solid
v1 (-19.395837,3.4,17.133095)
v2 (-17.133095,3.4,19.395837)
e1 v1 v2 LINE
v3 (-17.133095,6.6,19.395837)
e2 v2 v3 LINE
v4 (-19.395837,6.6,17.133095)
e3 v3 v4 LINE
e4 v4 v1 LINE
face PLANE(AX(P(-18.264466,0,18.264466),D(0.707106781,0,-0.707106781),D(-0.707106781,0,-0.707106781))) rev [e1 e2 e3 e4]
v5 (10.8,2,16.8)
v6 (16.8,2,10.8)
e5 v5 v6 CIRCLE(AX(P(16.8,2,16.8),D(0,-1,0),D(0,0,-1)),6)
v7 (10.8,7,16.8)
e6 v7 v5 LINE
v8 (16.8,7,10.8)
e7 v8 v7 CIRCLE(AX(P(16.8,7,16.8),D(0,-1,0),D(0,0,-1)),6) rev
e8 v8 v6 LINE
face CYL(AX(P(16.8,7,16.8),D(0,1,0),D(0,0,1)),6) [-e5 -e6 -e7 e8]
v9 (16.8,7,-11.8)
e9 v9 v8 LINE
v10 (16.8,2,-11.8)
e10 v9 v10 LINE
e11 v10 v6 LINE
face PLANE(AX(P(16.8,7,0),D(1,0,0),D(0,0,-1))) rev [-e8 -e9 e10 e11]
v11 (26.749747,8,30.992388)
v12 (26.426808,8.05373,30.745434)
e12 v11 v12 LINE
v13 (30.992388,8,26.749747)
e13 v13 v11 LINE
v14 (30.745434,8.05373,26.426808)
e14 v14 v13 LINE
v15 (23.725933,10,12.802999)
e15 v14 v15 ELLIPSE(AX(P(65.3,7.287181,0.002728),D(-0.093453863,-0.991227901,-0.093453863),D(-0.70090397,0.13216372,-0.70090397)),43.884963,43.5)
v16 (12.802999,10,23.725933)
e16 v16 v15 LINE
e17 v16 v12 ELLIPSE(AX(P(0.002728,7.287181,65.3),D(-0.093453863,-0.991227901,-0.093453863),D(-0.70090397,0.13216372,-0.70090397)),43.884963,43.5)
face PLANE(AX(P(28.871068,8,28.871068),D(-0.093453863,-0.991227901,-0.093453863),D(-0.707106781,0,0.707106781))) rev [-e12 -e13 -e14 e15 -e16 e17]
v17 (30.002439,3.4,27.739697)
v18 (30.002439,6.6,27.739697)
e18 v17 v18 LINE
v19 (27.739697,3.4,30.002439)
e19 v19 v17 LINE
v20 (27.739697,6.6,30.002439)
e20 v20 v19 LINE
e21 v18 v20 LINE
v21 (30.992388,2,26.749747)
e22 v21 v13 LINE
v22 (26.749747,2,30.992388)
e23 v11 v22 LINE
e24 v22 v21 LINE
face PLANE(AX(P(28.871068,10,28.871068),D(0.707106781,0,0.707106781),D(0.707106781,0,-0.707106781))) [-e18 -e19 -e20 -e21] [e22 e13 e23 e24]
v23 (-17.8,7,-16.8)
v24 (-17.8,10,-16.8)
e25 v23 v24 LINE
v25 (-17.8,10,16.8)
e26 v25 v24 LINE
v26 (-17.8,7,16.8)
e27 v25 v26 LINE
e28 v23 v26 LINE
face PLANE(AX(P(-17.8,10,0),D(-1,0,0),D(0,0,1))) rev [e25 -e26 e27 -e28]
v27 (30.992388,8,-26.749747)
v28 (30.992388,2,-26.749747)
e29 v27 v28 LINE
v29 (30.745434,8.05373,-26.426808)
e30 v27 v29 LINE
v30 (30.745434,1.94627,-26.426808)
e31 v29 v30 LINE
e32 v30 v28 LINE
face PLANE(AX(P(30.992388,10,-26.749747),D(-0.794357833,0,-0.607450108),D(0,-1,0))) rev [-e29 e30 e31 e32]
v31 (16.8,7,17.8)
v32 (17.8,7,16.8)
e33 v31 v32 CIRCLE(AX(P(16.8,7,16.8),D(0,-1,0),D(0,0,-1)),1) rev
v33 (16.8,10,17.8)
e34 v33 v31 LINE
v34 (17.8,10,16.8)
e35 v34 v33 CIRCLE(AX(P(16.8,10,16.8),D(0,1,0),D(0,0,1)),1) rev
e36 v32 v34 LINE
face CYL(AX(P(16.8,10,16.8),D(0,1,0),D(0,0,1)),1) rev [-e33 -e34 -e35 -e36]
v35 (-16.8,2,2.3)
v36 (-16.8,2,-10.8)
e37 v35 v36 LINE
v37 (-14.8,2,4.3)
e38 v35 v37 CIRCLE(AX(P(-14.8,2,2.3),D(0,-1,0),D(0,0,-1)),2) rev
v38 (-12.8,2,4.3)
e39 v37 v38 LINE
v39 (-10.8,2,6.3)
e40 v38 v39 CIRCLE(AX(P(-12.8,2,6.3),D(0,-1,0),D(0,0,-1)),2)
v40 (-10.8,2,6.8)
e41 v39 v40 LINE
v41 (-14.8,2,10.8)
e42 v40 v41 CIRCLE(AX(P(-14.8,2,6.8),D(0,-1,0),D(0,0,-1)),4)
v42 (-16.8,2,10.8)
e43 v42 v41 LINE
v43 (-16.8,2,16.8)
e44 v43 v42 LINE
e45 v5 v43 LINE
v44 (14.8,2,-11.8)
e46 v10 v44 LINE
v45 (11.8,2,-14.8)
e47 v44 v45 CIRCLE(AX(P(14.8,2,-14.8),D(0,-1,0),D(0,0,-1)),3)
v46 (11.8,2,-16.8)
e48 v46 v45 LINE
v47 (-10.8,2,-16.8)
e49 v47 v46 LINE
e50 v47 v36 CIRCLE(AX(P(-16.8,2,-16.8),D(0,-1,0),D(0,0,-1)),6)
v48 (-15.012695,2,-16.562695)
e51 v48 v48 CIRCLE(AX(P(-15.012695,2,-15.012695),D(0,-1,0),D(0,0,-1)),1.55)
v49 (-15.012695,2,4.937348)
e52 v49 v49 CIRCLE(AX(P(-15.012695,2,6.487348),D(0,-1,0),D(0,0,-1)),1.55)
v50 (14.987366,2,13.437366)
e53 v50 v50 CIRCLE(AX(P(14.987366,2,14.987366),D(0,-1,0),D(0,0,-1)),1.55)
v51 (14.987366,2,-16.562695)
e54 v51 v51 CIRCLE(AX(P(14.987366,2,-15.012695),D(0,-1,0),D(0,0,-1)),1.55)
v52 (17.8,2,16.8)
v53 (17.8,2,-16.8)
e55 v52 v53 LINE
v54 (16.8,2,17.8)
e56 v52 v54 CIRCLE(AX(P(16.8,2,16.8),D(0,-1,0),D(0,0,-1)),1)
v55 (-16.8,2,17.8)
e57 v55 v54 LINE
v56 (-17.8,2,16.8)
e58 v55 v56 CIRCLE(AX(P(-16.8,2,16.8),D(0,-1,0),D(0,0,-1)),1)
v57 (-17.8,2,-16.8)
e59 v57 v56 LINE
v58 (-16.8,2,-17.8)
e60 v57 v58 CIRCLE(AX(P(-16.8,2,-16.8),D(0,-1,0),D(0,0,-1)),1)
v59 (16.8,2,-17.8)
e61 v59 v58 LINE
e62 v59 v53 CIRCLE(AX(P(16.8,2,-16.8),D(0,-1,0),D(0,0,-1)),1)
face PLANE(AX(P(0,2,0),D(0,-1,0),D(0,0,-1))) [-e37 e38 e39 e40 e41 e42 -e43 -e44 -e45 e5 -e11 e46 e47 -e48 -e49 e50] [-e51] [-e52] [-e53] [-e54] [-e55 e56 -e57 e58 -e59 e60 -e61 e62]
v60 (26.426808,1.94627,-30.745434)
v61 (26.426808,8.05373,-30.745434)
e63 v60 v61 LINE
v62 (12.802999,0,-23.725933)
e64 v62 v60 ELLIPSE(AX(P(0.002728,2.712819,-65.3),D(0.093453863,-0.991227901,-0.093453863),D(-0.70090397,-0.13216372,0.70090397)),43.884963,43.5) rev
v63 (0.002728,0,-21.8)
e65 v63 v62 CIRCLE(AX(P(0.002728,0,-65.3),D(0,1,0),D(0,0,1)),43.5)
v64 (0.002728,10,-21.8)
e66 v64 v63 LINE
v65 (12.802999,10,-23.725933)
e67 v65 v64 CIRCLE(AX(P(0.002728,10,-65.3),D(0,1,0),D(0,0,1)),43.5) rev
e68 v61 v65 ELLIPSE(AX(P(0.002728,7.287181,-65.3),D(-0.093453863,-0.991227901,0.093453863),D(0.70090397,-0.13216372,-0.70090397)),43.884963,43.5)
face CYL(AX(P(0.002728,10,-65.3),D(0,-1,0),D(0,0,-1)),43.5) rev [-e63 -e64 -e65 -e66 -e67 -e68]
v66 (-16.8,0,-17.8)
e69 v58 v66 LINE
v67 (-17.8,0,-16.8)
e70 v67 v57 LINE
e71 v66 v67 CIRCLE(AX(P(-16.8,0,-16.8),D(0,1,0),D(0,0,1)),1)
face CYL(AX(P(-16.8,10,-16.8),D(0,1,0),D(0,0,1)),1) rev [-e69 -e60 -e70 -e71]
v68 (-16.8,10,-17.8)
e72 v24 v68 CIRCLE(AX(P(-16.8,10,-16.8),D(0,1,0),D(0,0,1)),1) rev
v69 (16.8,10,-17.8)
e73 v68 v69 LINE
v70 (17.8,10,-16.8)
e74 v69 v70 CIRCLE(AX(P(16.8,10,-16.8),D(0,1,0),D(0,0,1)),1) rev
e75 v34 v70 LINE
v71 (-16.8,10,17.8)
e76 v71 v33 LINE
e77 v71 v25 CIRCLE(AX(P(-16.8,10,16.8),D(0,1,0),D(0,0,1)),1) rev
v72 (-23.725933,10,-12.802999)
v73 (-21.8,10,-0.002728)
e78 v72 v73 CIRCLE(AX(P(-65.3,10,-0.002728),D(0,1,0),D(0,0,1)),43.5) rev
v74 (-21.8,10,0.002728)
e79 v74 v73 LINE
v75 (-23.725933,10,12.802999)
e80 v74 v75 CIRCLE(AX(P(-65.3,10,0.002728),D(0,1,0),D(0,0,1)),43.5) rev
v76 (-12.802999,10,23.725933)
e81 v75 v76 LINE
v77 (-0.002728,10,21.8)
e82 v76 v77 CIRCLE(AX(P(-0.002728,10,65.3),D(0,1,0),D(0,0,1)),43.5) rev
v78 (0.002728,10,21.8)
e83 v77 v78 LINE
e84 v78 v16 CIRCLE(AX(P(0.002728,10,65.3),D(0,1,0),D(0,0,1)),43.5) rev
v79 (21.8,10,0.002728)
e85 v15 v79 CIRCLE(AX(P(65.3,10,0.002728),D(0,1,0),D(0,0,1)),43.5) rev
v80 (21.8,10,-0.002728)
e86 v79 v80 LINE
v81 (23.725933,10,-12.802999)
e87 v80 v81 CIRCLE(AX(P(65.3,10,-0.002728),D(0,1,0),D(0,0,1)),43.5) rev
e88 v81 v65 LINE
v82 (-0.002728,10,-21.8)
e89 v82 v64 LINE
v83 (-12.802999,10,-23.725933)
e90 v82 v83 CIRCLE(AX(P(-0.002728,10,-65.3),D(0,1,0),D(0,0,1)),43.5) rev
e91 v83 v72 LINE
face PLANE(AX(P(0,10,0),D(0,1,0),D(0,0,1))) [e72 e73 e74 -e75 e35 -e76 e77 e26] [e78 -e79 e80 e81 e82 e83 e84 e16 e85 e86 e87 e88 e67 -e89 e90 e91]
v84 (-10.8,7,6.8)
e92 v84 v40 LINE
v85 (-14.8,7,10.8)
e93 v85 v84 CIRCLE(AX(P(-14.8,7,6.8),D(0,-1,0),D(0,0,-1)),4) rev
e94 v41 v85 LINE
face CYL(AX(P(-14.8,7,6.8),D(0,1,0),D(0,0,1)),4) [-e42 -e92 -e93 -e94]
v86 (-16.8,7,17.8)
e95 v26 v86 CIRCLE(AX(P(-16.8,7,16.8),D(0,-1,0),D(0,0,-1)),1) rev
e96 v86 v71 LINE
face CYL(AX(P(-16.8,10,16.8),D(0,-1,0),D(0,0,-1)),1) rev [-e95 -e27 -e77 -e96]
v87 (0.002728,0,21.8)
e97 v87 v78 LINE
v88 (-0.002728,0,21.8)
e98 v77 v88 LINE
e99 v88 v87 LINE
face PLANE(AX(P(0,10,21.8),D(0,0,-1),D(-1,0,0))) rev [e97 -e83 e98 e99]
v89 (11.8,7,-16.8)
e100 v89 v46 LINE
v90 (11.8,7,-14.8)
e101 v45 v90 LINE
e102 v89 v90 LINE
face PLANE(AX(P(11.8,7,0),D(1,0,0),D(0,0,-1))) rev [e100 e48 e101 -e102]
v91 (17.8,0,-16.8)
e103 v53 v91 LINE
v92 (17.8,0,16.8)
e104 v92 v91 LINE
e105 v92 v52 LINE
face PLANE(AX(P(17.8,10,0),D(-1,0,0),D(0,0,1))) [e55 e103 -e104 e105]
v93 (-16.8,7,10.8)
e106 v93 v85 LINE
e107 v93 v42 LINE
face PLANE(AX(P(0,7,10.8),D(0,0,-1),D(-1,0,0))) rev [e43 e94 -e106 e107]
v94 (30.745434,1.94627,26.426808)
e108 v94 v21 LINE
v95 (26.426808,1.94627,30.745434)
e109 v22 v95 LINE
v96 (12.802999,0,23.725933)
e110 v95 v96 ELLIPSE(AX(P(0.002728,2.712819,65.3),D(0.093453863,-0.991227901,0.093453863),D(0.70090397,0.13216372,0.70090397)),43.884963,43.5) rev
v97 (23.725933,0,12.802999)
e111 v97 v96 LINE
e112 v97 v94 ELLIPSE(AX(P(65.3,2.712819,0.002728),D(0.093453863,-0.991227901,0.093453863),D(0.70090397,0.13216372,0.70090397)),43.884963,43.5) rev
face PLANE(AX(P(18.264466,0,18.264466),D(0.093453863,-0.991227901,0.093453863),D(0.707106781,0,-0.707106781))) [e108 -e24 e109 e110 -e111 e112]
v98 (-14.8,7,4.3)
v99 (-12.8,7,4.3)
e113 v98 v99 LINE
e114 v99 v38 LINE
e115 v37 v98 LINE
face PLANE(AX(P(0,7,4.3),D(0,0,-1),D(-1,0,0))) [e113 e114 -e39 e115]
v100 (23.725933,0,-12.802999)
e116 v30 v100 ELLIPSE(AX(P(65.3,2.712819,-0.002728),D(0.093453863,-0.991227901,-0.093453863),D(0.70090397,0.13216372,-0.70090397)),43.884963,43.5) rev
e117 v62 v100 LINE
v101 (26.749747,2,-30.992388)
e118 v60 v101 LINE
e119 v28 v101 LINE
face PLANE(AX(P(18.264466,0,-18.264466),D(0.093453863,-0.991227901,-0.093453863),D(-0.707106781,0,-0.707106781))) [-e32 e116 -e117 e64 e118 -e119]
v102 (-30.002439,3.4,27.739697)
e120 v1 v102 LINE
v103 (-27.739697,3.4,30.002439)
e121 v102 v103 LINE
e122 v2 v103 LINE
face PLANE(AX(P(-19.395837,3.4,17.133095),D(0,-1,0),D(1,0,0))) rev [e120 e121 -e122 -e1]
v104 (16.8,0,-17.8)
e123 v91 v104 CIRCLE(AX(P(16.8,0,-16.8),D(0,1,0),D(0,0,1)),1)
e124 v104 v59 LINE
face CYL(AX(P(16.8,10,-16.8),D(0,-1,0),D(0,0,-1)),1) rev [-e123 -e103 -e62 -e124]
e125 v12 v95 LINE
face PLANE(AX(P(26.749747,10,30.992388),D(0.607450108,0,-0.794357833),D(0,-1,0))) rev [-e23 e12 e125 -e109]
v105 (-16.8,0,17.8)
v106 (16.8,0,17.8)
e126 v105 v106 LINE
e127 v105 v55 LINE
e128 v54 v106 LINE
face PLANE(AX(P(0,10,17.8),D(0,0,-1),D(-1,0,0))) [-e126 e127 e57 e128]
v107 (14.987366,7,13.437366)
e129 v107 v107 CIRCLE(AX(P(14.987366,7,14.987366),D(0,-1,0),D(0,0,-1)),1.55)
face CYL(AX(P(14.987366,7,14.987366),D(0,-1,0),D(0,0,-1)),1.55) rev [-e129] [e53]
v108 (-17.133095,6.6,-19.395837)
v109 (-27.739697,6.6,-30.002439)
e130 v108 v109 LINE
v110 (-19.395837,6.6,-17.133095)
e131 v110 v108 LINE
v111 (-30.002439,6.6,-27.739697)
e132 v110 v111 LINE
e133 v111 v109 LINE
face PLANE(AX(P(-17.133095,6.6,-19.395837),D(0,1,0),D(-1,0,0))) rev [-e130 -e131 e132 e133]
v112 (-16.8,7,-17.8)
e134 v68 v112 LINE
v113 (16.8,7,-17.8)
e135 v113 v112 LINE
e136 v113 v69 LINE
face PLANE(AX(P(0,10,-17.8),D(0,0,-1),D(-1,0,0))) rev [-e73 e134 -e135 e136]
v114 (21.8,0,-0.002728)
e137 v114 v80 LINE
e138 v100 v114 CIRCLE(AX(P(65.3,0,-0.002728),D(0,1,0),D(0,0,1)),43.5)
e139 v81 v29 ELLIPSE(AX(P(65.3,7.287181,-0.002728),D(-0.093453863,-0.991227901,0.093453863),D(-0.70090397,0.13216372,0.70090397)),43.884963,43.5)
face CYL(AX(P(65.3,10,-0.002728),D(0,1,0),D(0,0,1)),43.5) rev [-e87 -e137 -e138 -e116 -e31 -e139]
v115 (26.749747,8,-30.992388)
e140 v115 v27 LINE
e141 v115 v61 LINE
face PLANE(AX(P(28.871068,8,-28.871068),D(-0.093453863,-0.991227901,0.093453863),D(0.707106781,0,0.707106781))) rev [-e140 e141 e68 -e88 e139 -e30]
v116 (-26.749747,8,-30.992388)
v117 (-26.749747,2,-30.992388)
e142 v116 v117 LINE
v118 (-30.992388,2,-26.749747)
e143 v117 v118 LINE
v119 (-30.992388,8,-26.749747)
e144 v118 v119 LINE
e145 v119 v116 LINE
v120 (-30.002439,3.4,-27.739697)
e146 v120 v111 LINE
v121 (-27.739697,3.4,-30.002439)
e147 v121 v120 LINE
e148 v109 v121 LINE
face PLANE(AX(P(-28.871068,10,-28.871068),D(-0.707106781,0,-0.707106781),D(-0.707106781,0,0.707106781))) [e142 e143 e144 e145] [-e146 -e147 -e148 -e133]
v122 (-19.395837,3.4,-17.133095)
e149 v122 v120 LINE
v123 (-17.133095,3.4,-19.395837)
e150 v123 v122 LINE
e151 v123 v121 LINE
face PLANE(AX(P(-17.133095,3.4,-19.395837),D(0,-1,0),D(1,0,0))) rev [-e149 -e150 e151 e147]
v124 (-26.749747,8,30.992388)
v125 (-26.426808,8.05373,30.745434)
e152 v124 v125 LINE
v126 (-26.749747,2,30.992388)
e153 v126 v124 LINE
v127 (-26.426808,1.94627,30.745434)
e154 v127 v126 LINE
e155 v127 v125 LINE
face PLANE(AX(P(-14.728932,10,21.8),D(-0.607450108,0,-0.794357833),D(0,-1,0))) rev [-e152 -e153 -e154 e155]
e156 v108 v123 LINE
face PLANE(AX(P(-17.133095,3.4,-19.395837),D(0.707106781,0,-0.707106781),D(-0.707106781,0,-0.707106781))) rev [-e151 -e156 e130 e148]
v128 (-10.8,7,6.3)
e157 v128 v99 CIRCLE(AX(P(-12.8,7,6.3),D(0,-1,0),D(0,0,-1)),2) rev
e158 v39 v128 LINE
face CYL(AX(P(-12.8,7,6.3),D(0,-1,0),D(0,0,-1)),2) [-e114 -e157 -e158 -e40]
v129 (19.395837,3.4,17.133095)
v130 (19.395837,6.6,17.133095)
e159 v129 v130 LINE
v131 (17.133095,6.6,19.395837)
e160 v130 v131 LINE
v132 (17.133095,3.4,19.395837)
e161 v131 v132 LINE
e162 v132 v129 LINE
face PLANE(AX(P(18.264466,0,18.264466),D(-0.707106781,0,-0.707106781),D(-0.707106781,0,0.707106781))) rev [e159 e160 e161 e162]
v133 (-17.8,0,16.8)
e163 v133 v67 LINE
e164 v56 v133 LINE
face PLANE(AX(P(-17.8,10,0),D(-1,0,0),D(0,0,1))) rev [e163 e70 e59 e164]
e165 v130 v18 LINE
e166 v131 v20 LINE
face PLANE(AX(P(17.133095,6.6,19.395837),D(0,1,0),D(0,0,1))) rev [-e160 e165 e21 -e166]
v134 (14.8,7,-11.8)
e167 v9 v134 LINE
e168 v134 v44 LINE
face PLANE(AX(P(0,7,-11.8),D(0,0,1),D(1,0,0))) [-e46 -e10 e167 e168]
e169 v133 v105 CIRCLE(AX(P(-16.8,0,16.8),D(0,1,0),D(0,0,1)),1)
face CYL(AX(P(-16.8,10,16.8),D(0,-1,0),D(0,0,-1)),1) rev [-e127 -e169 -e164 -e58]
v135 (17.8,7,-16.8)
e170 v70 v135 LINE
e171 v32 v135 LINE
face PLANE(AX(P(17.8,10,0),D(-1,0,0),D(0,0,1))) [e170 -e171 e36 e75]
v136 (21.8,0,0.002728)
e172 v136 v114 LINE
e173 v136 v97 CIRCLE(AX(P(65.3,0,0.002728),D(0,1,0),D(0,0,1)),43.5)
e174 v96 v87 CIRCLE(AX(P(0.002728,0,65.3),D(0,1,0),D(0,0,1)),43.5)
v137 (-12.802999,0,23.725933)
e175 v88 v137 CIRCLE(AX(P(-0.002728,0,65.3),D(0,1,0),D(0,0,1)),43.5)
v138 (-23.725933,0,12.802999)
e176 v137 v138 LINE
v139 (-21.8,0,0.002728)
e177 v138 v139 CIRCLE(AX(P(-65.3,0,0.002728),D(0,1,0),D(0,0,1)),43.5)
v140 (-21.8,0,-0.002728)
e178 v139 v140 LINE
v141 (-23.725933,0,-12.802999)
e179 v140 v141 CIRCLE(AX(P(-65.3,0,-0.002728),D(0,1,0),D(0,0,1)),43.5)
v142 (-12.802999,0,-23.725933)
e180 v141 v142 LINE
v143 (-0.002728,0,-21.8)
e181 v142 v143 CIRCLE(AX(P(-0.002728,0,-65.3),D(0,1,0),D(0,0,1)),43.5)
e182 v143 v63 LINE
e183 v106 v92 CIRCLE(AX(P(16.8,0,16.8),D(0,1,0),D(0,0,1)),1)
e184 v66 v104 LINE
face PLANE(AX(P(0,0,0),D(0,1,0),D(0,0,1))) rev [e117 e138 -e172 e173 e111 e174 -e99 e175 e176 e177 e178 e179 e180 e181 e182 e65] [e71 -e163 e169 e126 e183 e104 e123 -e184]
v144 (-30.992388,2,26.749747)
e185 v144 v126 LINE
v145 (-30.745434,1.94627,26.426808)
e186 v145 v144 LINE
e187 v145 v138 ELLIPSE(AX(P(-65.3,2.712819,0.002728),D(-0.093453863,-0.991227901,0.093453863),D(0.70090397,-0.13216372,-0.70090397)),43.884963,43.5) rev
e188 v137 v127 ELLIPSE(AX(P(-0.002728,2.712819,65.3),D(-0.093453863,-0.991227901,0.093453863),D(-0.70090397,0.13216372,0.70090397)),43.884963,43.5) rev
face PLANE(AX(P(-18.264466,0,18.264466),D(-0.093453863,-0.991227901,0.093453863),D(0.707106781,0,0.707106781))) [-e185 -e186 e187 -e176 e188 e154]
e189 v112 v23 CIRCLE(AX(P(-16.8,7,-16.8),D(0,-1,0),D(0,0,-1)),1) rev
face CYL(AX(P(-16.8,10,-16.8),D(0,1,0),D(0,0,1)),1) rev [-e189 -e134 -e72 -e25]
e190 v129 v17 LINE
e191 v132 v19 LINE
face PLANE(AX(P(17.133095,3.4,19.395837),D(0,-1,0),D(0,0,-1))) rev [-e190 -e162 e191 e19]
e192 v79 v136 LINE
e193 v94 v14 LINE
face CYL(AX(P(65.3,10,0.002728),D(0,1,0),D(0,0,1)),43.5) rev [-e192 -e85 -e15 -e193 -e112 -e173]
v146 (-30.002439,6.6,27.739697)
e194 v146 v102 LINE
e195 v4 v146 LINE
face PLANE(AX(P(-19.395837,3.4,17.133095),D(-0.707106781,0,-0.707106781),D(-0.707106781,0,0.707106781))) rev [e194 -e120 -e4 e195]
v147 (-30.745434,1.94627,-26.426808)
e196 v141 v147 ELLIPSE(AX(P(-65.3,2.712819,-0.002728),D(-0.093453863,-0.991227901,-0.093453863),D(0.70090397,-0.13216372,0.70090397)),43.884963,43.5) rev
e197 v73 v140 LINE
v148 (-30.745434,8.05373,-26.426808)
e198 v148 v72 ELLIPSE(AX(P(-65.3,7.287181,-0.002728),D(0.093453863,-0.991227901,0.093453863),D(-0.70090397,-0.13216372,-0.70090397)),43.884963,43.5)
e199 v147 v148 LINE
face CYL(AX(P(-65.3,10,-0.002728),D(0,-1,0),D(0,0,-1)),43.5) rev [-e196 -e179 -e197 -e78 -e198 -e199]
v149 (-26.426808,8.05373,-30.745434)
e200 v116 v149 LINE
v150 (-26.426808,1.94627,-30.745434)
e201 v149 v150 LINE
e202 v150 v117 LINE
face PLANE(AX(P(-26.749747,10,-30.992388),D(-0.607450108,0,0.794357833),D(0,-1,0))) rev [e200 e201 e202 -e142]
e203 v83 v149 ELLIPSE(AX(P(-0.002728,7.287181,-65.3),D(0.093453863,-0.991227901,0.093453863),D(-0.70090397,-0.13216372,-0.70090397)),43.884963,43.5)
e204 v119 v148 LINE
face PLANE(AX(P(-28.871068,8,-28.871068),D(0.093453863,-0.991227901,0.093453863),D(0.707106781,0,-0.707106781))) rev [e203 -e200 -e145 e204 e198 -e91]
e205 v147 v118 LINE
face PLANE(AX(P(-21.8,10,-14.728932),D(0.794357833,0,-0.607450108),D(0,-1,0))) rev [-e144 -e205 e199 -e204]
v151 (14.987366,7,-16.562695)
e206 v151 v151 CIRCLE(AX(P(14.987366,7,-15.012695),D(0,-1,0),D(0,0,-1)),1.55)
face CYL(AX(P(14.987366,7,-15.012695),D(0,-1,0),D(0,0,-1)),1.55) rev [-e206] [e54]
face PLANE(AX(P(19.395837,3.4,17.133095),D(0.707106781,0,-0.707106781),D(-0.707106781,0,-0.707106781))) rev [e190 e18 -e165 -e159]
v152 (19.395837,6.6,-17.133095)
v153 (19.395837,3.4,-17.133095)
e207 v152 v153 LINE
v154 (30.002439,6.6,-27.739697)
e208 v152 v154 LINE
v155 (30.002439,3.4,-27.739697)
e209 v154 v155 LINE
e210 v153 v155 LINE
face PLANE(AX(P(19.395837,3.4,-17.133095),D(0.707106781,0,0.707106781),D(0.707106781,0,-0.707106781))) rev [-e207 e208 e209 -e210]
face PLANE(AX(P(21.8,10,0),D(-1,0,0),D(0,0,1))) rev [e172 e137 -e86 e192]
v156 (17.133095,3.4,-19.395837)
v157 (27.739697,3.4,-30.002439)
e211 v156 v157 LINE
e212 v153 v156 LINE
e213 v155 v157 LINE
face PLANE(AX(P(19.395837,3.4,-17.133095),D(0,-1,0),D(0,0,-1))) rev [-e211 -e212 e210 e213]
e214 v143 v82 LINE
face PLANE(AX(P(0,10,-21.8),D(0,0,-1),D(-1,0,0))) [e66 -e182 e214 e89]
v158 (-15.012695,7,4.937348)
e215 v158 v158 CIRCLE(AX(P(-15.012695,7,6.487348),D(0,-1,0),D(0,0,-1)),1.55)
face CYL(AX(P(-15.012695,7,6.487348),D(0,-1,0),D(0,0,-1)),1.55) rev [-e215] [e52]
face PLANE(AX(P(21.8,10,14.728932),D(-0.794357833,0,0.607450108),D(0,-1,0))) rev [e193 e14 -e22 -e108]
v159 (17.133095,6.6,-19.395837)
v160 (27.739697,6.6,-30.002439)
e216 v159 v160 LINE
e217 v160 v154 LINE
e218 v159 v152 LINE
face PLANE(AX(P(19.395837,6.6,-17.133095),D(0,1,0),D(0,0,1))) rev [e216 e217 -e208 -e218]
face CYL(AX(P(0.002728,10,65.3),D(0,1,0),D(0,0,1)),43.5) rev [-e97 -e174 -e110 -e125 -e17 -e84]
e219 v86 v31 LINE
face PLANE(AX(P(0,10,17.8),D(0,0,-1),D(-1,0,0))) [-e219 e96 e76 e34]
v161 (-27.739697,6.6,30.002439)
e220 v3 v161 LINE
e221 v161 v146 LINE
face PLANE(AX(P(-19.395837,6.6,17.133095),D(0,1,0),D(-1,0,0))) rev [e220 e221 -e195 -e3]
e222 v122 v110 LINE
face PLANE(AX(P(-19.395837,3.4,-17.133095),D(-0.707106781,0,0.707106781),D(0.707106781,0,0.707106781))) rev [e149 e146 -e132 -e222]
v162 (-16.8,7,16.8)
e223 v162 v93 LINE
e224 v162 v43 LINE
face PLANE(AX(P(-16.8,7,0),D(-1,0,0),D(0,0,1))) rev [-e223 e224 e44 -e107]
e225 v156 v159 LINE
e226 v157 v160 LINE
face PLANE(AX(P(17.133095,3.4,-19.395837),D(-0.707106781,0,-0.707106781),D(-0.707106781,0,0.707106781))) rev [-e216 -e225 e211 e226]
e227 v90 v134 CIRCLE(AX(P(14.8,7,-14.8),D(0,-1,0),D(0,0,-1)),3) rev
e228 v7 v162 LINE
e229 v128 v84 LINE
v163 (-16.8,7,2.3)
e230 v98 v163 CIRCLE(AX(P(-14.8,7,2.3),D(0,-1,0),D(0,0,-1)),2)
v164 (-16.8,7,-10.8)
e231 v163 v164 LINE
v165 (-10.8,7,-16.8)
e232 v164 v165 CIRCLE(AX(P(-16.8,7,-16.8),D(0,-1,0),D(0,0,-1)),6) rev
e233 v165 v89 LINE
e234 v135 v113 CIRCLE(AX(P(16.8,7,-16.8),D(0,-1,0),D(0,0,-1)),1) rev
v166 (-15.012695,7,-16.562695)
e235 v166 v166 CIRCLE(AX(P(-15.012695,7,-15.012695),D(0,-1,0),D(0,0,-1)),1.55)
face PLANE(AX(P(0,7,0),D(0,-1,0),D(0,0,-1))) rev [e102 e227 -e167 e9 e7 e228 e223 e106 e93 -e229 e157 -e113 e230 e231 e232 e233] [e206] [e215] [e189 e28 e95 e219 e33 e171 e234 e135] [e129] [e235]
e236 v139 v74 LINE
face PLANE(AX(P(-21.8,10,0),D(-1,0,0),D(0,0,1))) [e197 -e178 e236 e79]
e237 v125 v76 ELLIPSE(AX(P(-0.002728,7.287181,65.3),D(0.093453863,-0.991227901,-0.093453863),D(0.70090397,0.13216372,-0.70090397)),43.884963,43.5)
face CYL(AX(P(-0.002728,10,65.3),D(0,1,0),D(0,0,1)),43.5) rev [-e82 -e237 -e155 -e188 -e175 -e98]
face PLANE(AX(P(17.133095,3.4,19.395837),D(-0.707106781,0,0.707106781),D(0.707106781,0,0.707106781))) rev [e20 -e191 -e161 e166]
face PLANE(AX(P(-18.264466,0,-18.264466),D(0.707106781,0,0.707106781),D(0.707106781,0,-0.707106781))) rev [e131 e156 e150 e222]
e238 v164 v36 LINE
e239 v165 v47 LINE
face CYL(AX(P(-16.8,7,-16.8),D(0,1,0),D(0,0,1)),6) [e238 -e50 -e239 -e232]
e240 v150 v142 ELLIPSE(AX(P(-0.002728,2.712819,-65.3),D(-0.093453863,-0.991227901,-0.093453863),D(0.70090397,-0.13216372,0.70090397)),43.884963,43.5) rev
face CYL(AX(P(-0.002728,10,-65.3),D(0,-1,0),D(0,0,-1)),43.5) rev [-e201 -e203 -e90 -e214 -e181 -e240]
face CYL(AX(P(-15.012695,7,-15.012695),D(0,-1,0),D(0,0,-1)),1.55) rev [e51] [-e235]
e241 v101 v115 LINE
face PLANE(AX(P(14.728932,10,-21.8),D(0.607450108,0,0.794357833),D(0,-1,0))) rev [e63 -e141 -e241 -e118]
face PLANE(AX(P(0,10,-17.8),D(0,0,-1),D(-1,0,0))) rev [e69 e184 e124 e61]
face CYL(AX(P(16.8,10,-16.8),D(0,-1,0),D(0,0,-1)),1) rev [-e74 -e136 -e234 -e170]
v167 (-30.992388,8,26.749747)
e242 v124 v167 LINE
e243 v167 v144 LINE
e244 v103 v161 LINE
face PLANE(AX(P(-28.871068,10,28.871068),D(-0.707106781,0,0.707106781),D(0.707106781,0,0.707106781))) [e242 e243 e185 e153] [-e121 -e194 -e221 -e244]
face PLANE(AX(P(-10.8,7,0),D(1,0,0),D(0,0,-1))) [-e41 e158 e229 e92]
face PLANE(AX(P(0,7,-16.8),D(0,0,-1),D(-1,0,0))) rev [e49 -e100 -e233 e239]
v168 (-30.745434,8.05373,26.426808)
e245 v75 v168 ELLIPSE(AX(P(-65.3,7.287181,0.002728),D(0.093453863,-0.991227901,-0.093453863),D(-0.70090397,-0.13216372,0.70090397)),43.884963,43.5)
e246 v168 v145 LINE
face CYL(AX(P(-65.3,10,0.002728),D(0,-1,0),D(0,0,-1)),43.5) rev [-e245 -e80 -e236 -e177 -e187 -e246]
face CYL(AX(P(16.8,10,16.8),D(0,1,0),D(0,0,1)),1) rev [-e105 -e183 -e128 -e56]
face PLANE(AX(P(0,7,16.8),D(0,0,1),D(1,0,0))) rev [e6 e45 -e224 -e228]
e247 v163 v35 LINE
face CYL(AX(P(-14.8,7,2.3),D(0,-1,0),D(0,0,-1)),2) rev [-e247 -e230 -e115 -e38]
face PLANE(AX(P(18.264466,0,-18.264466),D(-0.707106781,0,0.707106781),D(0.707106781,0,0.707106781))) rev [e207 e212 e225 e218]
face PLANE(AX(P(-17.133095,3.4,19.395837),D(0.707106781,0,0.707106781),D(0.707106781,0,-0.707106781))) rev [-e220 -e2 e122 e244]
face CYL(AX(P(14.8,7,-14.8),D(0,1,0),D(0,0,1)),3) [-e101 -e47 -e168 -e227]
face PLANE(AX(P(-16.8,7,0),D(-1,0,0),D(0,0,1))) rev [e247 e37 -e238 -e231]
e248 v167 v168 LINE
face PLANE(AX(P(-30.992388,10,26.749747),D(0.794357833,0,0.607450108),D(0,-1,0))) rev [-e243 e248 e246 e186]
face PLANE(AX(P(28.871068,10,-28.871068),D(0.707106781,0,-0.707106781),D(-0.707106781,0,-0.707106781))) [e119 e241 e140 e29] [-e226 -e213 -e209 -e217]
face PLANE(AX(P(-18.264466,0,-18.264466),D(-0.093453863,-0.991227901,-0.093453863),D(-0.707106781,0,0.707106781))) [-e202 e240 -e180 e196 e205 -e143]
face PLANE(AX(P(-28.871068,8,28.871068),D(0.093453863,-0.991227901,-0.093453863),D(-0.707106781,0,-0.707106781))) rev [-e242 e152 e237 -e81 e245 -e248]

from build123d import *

# Parameters (mm, degrees)
ESQUISSE1_W                   = 43.6
ESQUISSE1_H                   = 43.6
ESQUISSE1_W_2                 = 35.6
ESQUISSE1_H_2                 = 35.6
BOSS_EXTRU_1_DEPTH            = 10
ESQUISSE2_W                   = 3.2
ESQUISSE2_H                   = 3.2
ENL_V_MAT_EXTRU_1_DEPTH       = 15
CHANFREIN1_SIZE               = 15
CHANFREIN1_SIZE_2             = 2
R_P_TITION_CIRCULAIRE10_COUNT = 4
BOSS_EXTRU_3_START            = -2
ESQUISSE6_W                   = 6
ESQUISSE6_H                   = 6.5
ESQUISSE6_R                   = 1.55
ESQUISSE6_H_2                 = 6
ESQUISSE6_W_2                 = 5
ESQUISSE6_H_3                 = 5
ESQUISSE6_W_3                 = 1
ESQUISSE6_H_4                 = 22.6
ESQUISSE6_H_5                 = 15.1
ESQUISSE6_W_4                 = 22.6
ESQUISSE6_H_6                 = 1
BOSS_EXTRU_3_DEPTH            = 5
CONG_1_R                      = 6
CONG_2_R                      = 3
CONG_3_R                      = 4
CONG_4_R                      = 2
CONG_8_R                      = 1
CONG_9_R                      = 43.5
CONG_10_R                     = 2


# Some blends are built 0.0001 mm under size
with BuildPart() as part:
    # Esquisse1 → Boss.-Extru.1 (new body)
    # profile 1 of 5: a face of its own
    with BuildSketch(Plane(origin=(0, 0, 0), x_dir=(1, 0, 0), z_dir=(0, 1, 0))):
        Rectangle(ESQUISSE1_W, ESQUISSE1_H)
        Rectangle(ESQUISSE1_W_2, ESQUISSE1_H_2, mode=Mode.SUBTRACT)
    # profile 2 of 5: a face of its own
    with BuildSketch(Plane(origin=(0, 0, 0), x_dir=(1, 0, 0), z_dir=(0, 1, 0))):
        Polygon((32.406601718, -25.335533906), (21.8, -14.728932188), (21.8, -21.8), (14.728932188, -21.8), (25.335533906, -32.406601718), align=None)
    # profile 3 of 5: a face of its own
    with BuildSketch(Plane(origin=(0, 0, 0), x_dir=(1, 0, 0), z_dir=(0, 1, 0))):
        Polygon((21.8, 21.8), (21.8, 14.728932188), (32.406601718, 25.335533906), (25.335533906, 32.406601718), (14.728932188, 21.8), align=None)
    # profile 4 of 5: a face of its own
    with BuildSketch(Plane(origin=(0, 0, 0), x_dir=(1, 0, 0), z_dir=(0, 1, 0))):
        Polygon((-21.8, 21.8), (-14.728932188, 21.8), (-25.335533906, 32.406601718), (-32.406601718, 25.335533906), (-21.8, 14.728932188), align=None)
    # profile 5 of 5: a face of its own
    with BuildSketch(Plane(origin=(0, 0, 0), x_dir=(1, 0, 0), z_dir=(0, 1, 0))):
        Polygon((-25.335533906, -32.406601718), (-14.728932188, -21.8), (-21.8, -21.8), (-21.8, -14.728932188), (-32.406601718, -25.335533906), align=None)
    extrude(amount=BOSS_EXTRU_1_DEPTH)

    # Esquisse2 → Enlèv. mat.-Extru.1 (cut)
    with BuildSketch(Plane(origin=(28.871067812, 0, 28.871067812), x_dir=(0.7071067811865475, 0, -0.7071067811865477), z_dir=(0.7071067811865477, 0, 0.7071067811865475))):
        with Locations((0, 5)):
            Rectangle(ESQUISSE2_W, ESQUISSE2_H)
    enl_v_mat_extru_1 = extrude(amount=-ENL_V_MAT_EXTRU_1_DEPTH, mode=Mode.SUBTRACT)

    # Chanfrein1
    # the kernel refuses this chamfer: 15, 2 mm, written as the material it takes off along each edge
    with BuildSketch(Plane(origin=(-2.232682747, 0, 59.974818371), x_dir=(-0.7070976396858032, -0.0050848698637449155, -0.7070976396858037), z_dir=(0.7071067811865478, 0, -0.7071067811865474)), Plane(origin=(59.974818371, 0, 2.232682747), x_dir=(-0.7070976396858033, -0.005084869863744911, 0.7070976396858037), z_dir=(-0.7071067811865477, 0, -0.7071067811865474)), Plane(origin=(2.232682747, 0, -59.974818371), x_dir=(0.7070976396858034, -0.005084869863744912, 0.7070976396858035), z_dir=(-0.7071067811865476, 0, 0.7071067811865476)), Plane(origin=(-59.974818371, 0, -2.232682747), x_dir=(0.7070976396858035, -0.005084869863744911, -0.7070976396858034), z_dir=(0.7071067811865476, 0, 0.7071067811865476))) as chanfrein1_piece_1:
        Polygon((CHANFREIN1_SIZE * 0.999987071966, CHANFREIN1_SIZE * 0.00508486986374), (-CHANFREIN1_SIZE_2 * 0.00508486986374, CHANFREIN1_SIZE_2 * 0.999987071966), (0, 0), align=None)
    extrude(amount=87.974691762, mode=Mode.SUBTRACT)
    with BuildSketch(Plane(origin=(-2.232682747, 10, 59.974818371), x_dir=(-0.7070976396858032, 0.005084869863744968, -0.7070976396858037), z_dir=(0.7071067811865478, 0, -0.7071067811865474)), Plane(origin=(59.974818371, 10, 2.232682747), x_dir=(-0.7070976396858033, 0.005084869863744967, 0.7070976396858037), z_dir=(-0.7071067811865477, 0, -0.7071067811865474)), Plane(origin=(2.232682747, 10, -59.974818371), x_dir=(0.7070976396858034, 0.005084869863744967, 0.7070976396858035), z_dir=(-0.7071067811865476, 0, 0.7071067811865476)), Plane(origin=(-59.974818371, 10, -2.232682747), x_dir=(0.7070976396858035, 0.005084869863744967, -0.7070976396858034), z_dir=(0.7071067811865476, 0, 0.7071067811865476))) as chanfrein1_piece_2:
        Polygon((CHANFREIN1_SIZE * 0.999987071966, -CHANFREIN1_SIZE * 0.00508486986374), (-CHANFREIN1_SIZE_2 * 0.00508486986374, -CHANFREIN1_SIZE_2 * 0.999987071966), (0, 0), align=None)
    extrude(amount=87.974691762, mode=Mode.SUBTRACT)
    with BuildSketch(Plane(origin=(25.335533906, -38.987345881, 32.406601718), x_dir=(-0.7106931856479084, 0, -0.7035020937236985), z_dir=(0, 1, 0))) as chanfrein1_piece_3_section:
        Polygon((CHANFREIN1_SIZE * 0.999987071966, -CHANFREIN1_SIZE * 0.00508486986374), (-CHANFREIN1_SIZE_2 * 0.00508486986374, -CHANFREIN1_SIZE_2 * 0.999987071966), (0, 0), align=None)
    chanfrein1_piece_3 = extrude(amount=87.974691762, mode=Mode.PRIVATE)
    chanfrein1_piece_3 = split(chanfrein1_piece_3, bisect_by=Plane(origin=(21.834036331, 5, 21.8), z_dir=(0, 0, 1)), keep=Keep.TOP, mode=Mode.PRIVATE)
    add(chanfrein1_piece_3, mode=Mode.SUBTRACT)
    with BuildSketch(Plane(origin=(32.406601718, -38.987345881, 25.335533906), x_dir=(-0.48538969413478916, 0, 0.8742979153742365), z_dir=(0, 1, 0))) as chanfrein1_piece_4_section:
        Polygon((CHANFREIN1_SIZE_2 * 0.961444328979, -CHANFREIN1_SIZE_2 * 0.274999640498), (-CHANFREIN1_SIZE * 0.274999640498, -CHANFREIN1_SIZE * 0.961444328979), (0, 0), align=None)
    chanfrein1_piece_4 = extrude(amount=87.974691762, mode=Mode.PRIVATE)
    chanfrein1_piece_4 = split(chanfrein1_piece_4, bisect_by=Plane(origin=(21.8, 5, 21.834036331), z_dir=(1, 0, 0)), keep=Keep.TOP, mode=Mode.PRIVATE)
    add(chanfrein1_piece_4, mode=Mode.SUBTRACT)
    with BuildSketch(Plane(origin=(32.406601718, -38.987345881, -25.335533906), x_dir=(-0.7035020937236987, 0, 0.7106931856479084), z_dir=(0, 1, 0))) as chanfrein1_piece_5_section:
        Polygon((CHANFREIN1_SIZE * 0.999987071966, -CHANFREIN1_SIZE * 0.00508486986374), (-CHANFREIN1_SIZE_2 * 0.00508486986374, -CHANFREIN1_SIZE_2 * 0.999987071966), (0, 0), align=None)
    chanfrein1_piece_5 = extrude(amount=87.974691762, mode=Mode.PRIVATE)
    chanfrein1_piece_5 = split(chanfrein1_piece_5, bisect_by=Plane(origin=(21.8, 5, -21.834036331), z_dir=(1, 0, 0)), keep=Keep.TOP, mode=Mode.PRIVATE)
    add(chanfrein1_piece_5, mode=Mode.SUBTRACT)
    with BuildSketch(Plane(origin=(25.335533906, -38.987345881, -32.406601718), x_dir=(0.874297915374238, 0, 0.48538969413478666), z_dir=(0, 1, 0))) as chanfrein1_piece_6_section:
        Polygon((CHANFREIN1_SIZE_2 * 0.961444328979, -CHANFREIN1_SIZE_2 * 0.274999640498), (-CHANFREIN1_SIZE * 0.274999640498, -CHANFREIN1_SIZE * 0.961444328979), (0, 0), align=None)
    chanfrein1_piece_6 = extrude(amount=87.974691762, mode=Mode.PRIVATE)
    chanfrein1_piece_6 = split(chanfrein1_piece_6, bisect_by=Plane(origin=(21.834036331, 5, -21.8), z_dir=(0, 0, -1)), keep=Keep.TOP, mode=Mode.PRIVATE)
    add(chanfrein1_piece_6, mode=Mode.SUBTRACT)
    with BuildSketch(Plane(origin=(-25.335533906, -38.987345881, -32.406601718), x_dir=(0.7106931856479084, 0, 0.7035020937236987), z_dir=(0, 1, 0))) as chanfrein1_piece_7_section:
        Polygon((CHANFREIN1_SIZE * 0.999987071966, -CHANFREIN1_SIZE * 0.00508486986375), (-CHANFREIN1_SIZE_2 * 0.00508486986374, -CHANFREIN1_SIZE_2 * 0.999987071966), (0, 0), align=None)
    chanfrein1_piece_7 = extrude(amount=87.974691762, mode=Mode.PRIVATE)
    chanfrein1_piece_7 = split(chanfrein1_piece_7, bisect_by=Plane(origin=(-21.834036331, 5, -21.8), z_dir=(0, 0, -1)), keep=Keep.TOP, mode=Mode.PRIVATE)
    add(chanfrein1_piece_7, mode=Mode.SUBTRACT)
    with BuildSketch(Plane(origin=(-32.406601718, -38.987345881, -25.335533906), x_dir=(0.48538969413478794, 0, -0.8742979153742373), z_dir=(0, 1, 0))) as chanfrein1_piece_8_section:
        Polygon((CHANFREIN1_SIZE_2 * 0.961444328979, -CHANFREIN1_SIZE_2 * 0.274999640498), (-CHANFREIN1_SIZE * 0.274999640498, -CHANFREIN1_SIZE * 0.961444328979), (0, 0), align=None)
    chanfrein1_piece_8 = extrude(amount=87.974691762, mode=Mode.PRIVATE)
    chanfrein1_piece_8 = split(chanfrein1_piece_8, bisect_by=Plane(origin=(-21.8, 5, -21.834036331), z_dir=(-1, 0, 0)), keep=Keep.TOP, mode=Mode.PRIVATE)
    add(chanfrein1_piece_8, mode=Mode.SUBTRACT)
    with BuildSketch(Plane(origin=(-32.406601718, -38.987345881, 25.335533906), x_dir=(0.7035020937236987, 0, -0.7106931856479084), z_dir=(0, 1, 0))) as chanfrein1_piece_9_section:
        Polygon((CHANFREIN1_SIZE * 0.999987071966, -CHANFREIN1_SIZE * 0.00508486986374), (-CHANFREIN1_SIZE_2 * 0.00508486986374, -CHANFREIN1_SIZE_2 * 0.999987071966), (0, 0), align=None)
    chanfrein1_piece_9 = extrude(amount=87.974691762, mode=Mode.PRIVATE)
    chanfrein1_piece_9 = split(chanfrein1_piece_9, bisect_by=Plane(origin=(-21.8, 5, 21.834036331), z_dir=(-1, 0, 0)), keep=Keep.TOP, mode=Mode.PRIVATE)
    add(chanfrein1_piece_9, mode=Mode.SUBTRACT)
    with BuildSketch(Plane(origin=(-25.335533906, -38.987345881, 32.406601718), x_dir=(0.7106931856479087, 0, -0.7035020937236982), z_dir=(0, 1, 0))) as chanfrein1_piece_10_section:
        Polygon((CHANFREIN1_SIZE * 0.999987071966, CHANFREIN1_SIZE * 0.00508486986374), (-CHANFREIN1_SIZE_2 * 0.00508486986375, CHANFREIN1_SIZE_2 * 0.999987071966), (0, 0), align=None)
    chanfrein1_piece_10 = extrude(amount=87.974691762, mode=Mode.PRIVATE)
    chanfrein1_piece_10 = split(chanfrein1_piece_10, bisect_by=Plane(origin=(-21.834036331, 5, 21.8), z_dir=(0, 0, 1)), keep=Keep.TOP, mode=Mode.PRIVATE)
    add(chanfrein1_piece_10, mode=Mode.SUBTRACT)

    # Répétition circulaire10: Enlèv. mat.-Extru.1 ×4 about axis
    r_p_tition_circulaire10_axis = Axis((0, 0, 0), (0, 1, 0))
    for i in range(1, R_P_TITION_CIRCULAIRE10_COUNT):
        add(enl_v_mat_extru_1.rotate(r_p_tition_circulaire10_axis, i * 360 / R_P_TITION_CIRCULAIRE10_COUNT), mode=Mode.SUBTRACT)

    # Esquisse6 → Boss.-Extru.3 (add)
    # profile 1 of 12: a face of its own
    with BuildSketch(Plane.XZ.offset(BOSS_EXTRU_3_START)):
        with Locations((-13.8, 7.55)):
            Rectangle(ESQUISSE6_W, ESQUISSE6_H)
        with Locations(Location((-15.012694945, 6.487348235, 0), (0, 0, 270))):
            Circle(ESQUISSE6_R, mode=Mode.SUBTRACT)
    # profile 2 of 12: a face of its own
    with BuildSketch(Plane.XZ.offset(BOSS_EXTRU_3_START)):
        with Locations((-13.8, -13.8)):
            Rectangle(ESQUISSE6_W, ESQUISSE6_H_2)
        with Locations(Location((-15.012694945, -15.012694945, 0), (0, 0, 270))):
            Circle(ESQUISSE6_R, mode=Mode.SUBTRACT)
    # profile 3 of 12: a face of its own
    with BuildSketch(Plane.XZ.offset(BOSS_EXTRU_3_START)):
        with Locations((14.3, -14.3)):
            Rectangle(ESQUISSE6_W_2, ESQUISSE6_H_3)
        with Locations(Location((14.987366015, -15.012694945, 0), (0, 0, 270))):
            Circle(ESQUISSE6_R, mode=Mode.SUBTRACT)
    # profile 4 of 12: a face of its own
    with BuildSketch(Plane.XZ.offset(BOSS_EXTRU_3_START)):
        Polygon((17.8, -17.8), (17.8, -11.8), (16.8, -11.8), (16.8, -16.8), (11.8, -16.8), (11.8, -17.8), align=None)
    # profile 5 of 12: a face of its own
    with BuildSketch(Plane.XZ.offset(BOSS_EXTRU_3_START)):
        Polygon((-16.8, -10.8), (-17.8, -10.8), (-17.8, -17.8), (-10.8, -17.8), (-10.8, -16.8), (-16.8, -16.8), align=None)
    # profile 6 of 12: a face of its own
    with BuildSketch(Plane.XZ.offset(BOSS_EXTRU_3_START)):
        with Locations((-17.3, 7.55)):
            Rectangle(ESQUISSE6_W_3, ESQUISSE6_H)
    # profile 7 of 12: a face of its own
    with BuildSketch(Plane.XZ.offset(BOSS_EXTRU_3_START)):
        Polygon((17.8, 10.8), (17.8, 17.8), (10.8, 17.8), (10.8, 16.8), (16.8, 16.8), (16.8, 10.8), align=None)
    # profile 8 of 12: a face of its own
    with BuildSketch(Plane.XZ.offset(BOSS_EXTRU_3_START)):
        with Locations((17.3, -0.5)):
            Rectangle(ESQUISSE6_W_3, ESQUISSE6_H_4)
    # profile 9 of 12: a face of its own
    with BuildSketch(Plane.XZ.offset(BOSS_EXTRU_3_START)):
        Polygon((10.8, 16.8), (10.8, 17.8), (-17.8, 17.8), (-17.8, 10.8), (-16.8, 10.8), (-16.8, 16.8), align=None)
    # profile 10 of 12: a face of its own
    with BuildSketch(Plane.XZ.offset(BOSS_EXTRU_3_START)):
        with Locations((-17.3, -3.25)):
            Rectangle(ESQUISSE6_W_3, ESQUISSE6_H_5)
    # profile 11 of 12: a face of its own
    with BuildSketch(Plane.XZ.offset(BOSS_EXTRU_3_START)):
        with Locations((0.5, -17.3)):
            Rectangle(ESQUISSE6_W_4, ESQUISSE6_H_6)
    # profile 12 of 12: a face of its own
    with BuildSketch(Plane.XZ.offset(BOSS_EXTRU_3_START)):
        with Locations((13.8, 13.8)):
            Rectangle(ESQUISSE6_W, ESQUISSE6_H_2)
        with Locations(Location((14.987366015, 14.987366015, 0), (0, 0, 270))):
            Circle(ESQUISSE6_R, mode=Mode.SUBTRACT)
    extrude(amount=-BOSS_EXTRU_3_DEPTH)

    # Congé1
    cong_1_edges = [part.edges().sort_by_distance(p)[0] for p in [
        (-10.8, 4.5, -10.8),
        (10.8, 4.5, 10.8),
    ]]
    fillet(cong_1_edges, radius=CONG_1_R - 0.0001)  # a hair under: the kernel refuses the full size

    # Congé2
    cong_2_edges = [part.edges().sort_by_distance(p)[0] for p in [
        (11.8, 4.5, -11.8),
    ]]
    fillet(cong_2_edges, radius=CONG_2_R)

    # Congé3
    cong_3_edges = [part.edges().sort_by_distance(p)[0] for p in [
        (-10.8, 4.5, 10.8),
    ]]
    fillet(cong_3_edges, radius=CONG_3_R)

    # Congé4
    cong_4_edges = [part.edges().sort_by_distance(p)[0] for p in [
        (-10.8, 4.5, 4.3),
    ]]
    fillet(cong_4_edges, radius=CONG_4_R)

    # Congé8
    cong_8_edges = [part.edges().sort_by_distance(p)[0] for p in [
        (17.8, 1, -17.8),
        (-17.8, 1, -17.8),
        (-17.8, 1, 17.8),
        (17.8, 1, 17.8),
        (17.8, 8.5, -17.8),
        (-17.8, 8.5, -17.8),
        (-17.8, 8.5, 17.8),
        (17.8, 8.5, 17.8),
    ]]
    fillet(cong_8_edges, radius=CONG_8_R)

    # Congé9
    # the kernel refuses this fillet: 43.5 mm, written as the material it adds along each edge
    with BuildSketch(Plane(origin=(-21.8, 0, 14.728932188), x_dir=(0, 0, -1), z_dir=(0, 1, 0))) as cong_9_piece_1_section:
        with BuildLine():
            CenterArc((CONG_9_R * 0.338533427618, CONG_9_R), CONG_9_R, 232.594643369, 37.405356631)
            Line((-CONG_9_R * 0.268916679953, CONG_9_R * 0.205642167023), (0, 0))
            Line((0, 0), (CONG_9_R * 0.338533427618, 0))
        make_face()
    cong_9_piece_1 = extrude(amount=10, mode=Mode.PRIVATE)
    cong_9_piece_1 = split(cong_9_piece_1, bisect_by=Plane(origin=(-23.815811659, 0.117652919, 13.961018177), z_dir=(0.09345386270338202, 0.9912279006826004, -0.09345386270338202)), keep=Keep.TOP, mode=Mode.PRIVATE)
    cong_9_piece_1 = split(cong_9_piece_1, bisect_by=Plane(origin=(-23.815811659, 9.882347081, 13.961018177), z_dir=(0.09345386270338202, -0.9912279006826004, -0.09345386270338202)), keep=Keep.TOP, mode=Mode.PRIVATE)
    add(cong_9_piece_1)
    with BuildSketch(Plane(origin=(-21.8, 0, -14.728932188), x_dir=(0, 0, 1), z_dir=(0, 1, 0))) as cong_9_piece_2_section:
        with BuildLine():
            CenterArc((CONG_9_R * 0.338533427618, -CONG_9_R), CONG_9_R, 90, 37.405356631)
            Line((-CONG_9_R * 0.268916679952, -CONG_9_R * 0.205642167022), (0, 0))
            Line((0, 0), (CONG_9_R * 0.338533427618, 0))
        make_face()
    cong_9_piece_2 = extrude(amount=10, mode=Mode.PRIVATE)
    cong_9_piece_2 = split(cong_9_piece_2, bisect_by=Plane(origin=(-23.815811659, 0.117652919, -13.961018177), z_dir=(0.09345386270338202, 0.9912279006826004, 0.09345386270338202)), keep=Keep.TOP, mode=Mode.PRIVATE)
    cong_9_piece_2 = split(cong_9_piece_2, bisect_by=Plane(origin=(-23.815811659, 9.882347081, -13.961018177), z_dir=(0.09345386270338202, -0.9912279006826004, 0.09345386270338202)), keep=Keep.TOP, mode=Mode.PRIVATE)
    add(cong_9_piece_2)
    with BuildSketch(Plane(origin=(-14.728932188, 0, -21.8), x_dir=(1, 0, 0), z_dir=(0, 1, 0))) as cong_9_piece_3_section:
        with BuildLine():
            CenterArc((CONG_9_R * 0.338533427618, CONG_9_R), CONG_9_R, 232.594643369, 37.405356631)
            Line((-CONG_9_R * 0.268916679953, CONG_9_R * 0.205642167023), (0, 0))
            Line((0, 0), (CONG_9_R * 0.338533427618, 0))
        make_face()
    cong_9_piece_3 = extrude(amount=10, mode=Mode.PRIVATE)
    cong_9_piece_3 = split(cong_9_piece_3, bisect_by=Plane(origin=(-13.961018177, 0.117652919, -23.815811659), z_dir=(0.09345386270338202, 0.9912279006826004, 0.09345386270338202)), keep=Keep.TOP, mode=Mode.PRIVATE)
    cong_9_piece_3 = split(cong_9_piece_3, bisect_by=Plane(origin=(-13.961018177, 9.882347081, -23.815811659), z_dir=(0.09345386270338202, -0.9912279006826004, 0.09345386270338202)), keep=Keep.TOP, mode=Mode.PRIVATE)
    add(cong_9_piece_3)
    with BuildSketch(Plane(origin=(14.728932188, 0, -21.8), x_dir=(-1, 0, 0), z_dir=(0, 1, 0))) as cong_9_piece_4_section:
        with BuildLine():
            CenterArc((CONG_9_R * 0.338533427618, -CONG_9_R), CONG_9_R, 90, 37.405356631)
            Line((-CONG_9_R * 0.268916679952, -CONG_9_R * 0.205642167022), (0, 0))
            Line((0, 0), (CONG_9_R * 0.338533427618, 0))
        make_face()
    cong_9_piece_4 = extrude(amount=10, mode=Mode.PRIVATE)
    cong_9_piece_4 = split(cong_9_piece_4, bisect_by=Plane(origin=(13.961018177, 0.117652919, -23.815811659), z_dir=(-0.09345386270338202, 0.9912279006826004, 0.09345386270338202)), keep=Keep.TOP, mode=Mode.PRIVATE)
    cong_9_piece_4 = split(cong_9_piece_4, bisect_by=Plane(origin=(13.961018177, 9.882347081, -23.815811659), z_dir=(-0.09345386270338202, -0.9912279006826004, 0.09345386270338202)), keep=Keep.TOP, mode=Mode.PRIVATE)
    add(cong_9_piece_4)
    with BuildSketch(Plane(origin=(21.8, 0, -14.728932188), x_dir=(0, 0, 1), z_dir=(0, 1, 0))) as cong_9_piece_5_section:
        with BuildLine():
            CenterArc((CONG_9_R * 0.338533427618, CONG_9_R), CONG_9_R, 232.594643369, 37.405356631)
            Line((-CONG_9_R * 0.268916679953, CONG_9_R * 0.205642167023), (0, 0))
            Line((0, 0), (CONG_9_R * 0.338533427618, 0))
        make_face()
    cong_9_piece_5 = extrude(amount=10, mode=Mode.PRIVATE)
    cong_9_piece_5 = split(cong_9_piece_5, bisect_by=Plane(origin=(23.815811659, 0.117652919, -13.961018177), z_dir=(-0.09345386270338202, 0.9912279006826004, 0.09345386270338202)), keep=Keep.TOP, mode=Mode.PRIVATE)
    cong_9_piece_5 = split(cong_9_piece_5, bisect_by=Plane(origin=(23.815811659, 9.882347081, -13.961018177), z_dir=(-0.09345386270338202, -0.9912279006826004, 0.09345386270338202)), keep=Keep.TOP, mode=Mode.PRIVATE)
    add(cong_9_piece_5)
    with BuildSketch(Plane(origin=(21.8, 0, 14.728932188), x_dir=(0, 0, -1), z_dir=(0, 1, 0))) as cong_9_piece_6_section:
        with BuildLine():
            CenterArc((CONG_9_R * 0.338533427618, -CONG_9_R), CONG_9_R, 90, 37.405356631)
            Line((-CONG_9_R * 0.268916679952, -CONG_9_R * 0.205642167022), (0, 0))
            Line((0, 0), (CONG_9_R * 0.338533427618, 0))
        make_face()
    cong_9_piece_6 = extrude(amount=10, mode=Mode.PRIVATE)
    cong_9_piece_6 = split(cong_9_piece_6, bisect_by=Plane(origin=(23.815811659, 0.117652919, 13.961018177), z_dir=(-0.09345386270338202, 0.9912279006826004, -0.09345386270338202)), keep=Keep.TOP, mode=Mode.PRIVATE)
    cong_9_piece_6 = split(cong_9_piece_6, bisect_by=Plane(origin=(23.815811659, 9.882347081, 13.961018177), z_dir=(-0.09345386270338202, -0.9912279006826004, -0.09345386270338202)), keep=Keep.TOP, mode=Mode.PRIVATE)
    add(cong_9_piece_6)
    with BuildSketch(Plane(origin=(14.728932188, 0, 21.8), x_dir=(-1, 0, 0), z_dir=(0, 1, 0))) as cong_9_piece_7_section:
        with BuildLine():
            CenterArc((CONG_9_R * 0.338533427618, CONG_9_R), CONG_9_R, 232.594643369, 37.405356631)
            Line((-CONG_9_R * 0.268916679953, CONG_9_R * 0.205642167023), (0, 0))
            Line((0, 0), (CONG_9_R * 0.338533427618, 0))
        make_face()
    cong_9_piece_7 = extrude(amount=10, mode=Mode.PRIVATE)
    cong_9_piece_7 = split(cong_9_piece_7, bisect_by=Plane(origin=(13.961018177, 0.117652919, 23.815811659), z_dir=(-0.09345386270338202, 0.9912279006826004, -0.09345386270338202)), keep=Keep.TOP, mode=Mode.PRIVATE)
    cong_9_piece_7 = split(cong_9_piece_7, bisect_by=Plane(origin=(13.961018177, 9.882347081, 23.815811659), z_dir=(-0.09345386270338202, -0.9912279006826004, -0.09345386270338202)), keep=Keep.TOP, mode=Mode.PRIVATE)
    add(cong_9_piece_7)
    with BuildSketch(Plane(origin=(-14.728932188, 0, 21.8), x_dir=(1, 0, 0), z_dir=(0, 1, 0))) as cong_9_piece_8_section:
        with BuildLine():
            CenterArc((CONG_9_R * 0.338533427618, -CONG_9_R), CONG_9_R, 90, 37.405356631)
            Line((-CONG_9_R * 0.268916679953, -CONG_9_R * 0.205642167023), (0, 0))
            Line((0, 0), (CONG_9_R * 0.338533427618, 0))
        make_face()
    cong_9_piece_8 = extrude(amount=10, mode=Mode.PRIVATE)
    cong_9_piece_8 = split(cong_9_piece_8, bisect_by=Plane(origin=(-13.961018177, 0.117652919, 23.815811659), z_dir=(0.09345386270338202, 0.9912279006826004, -0.09345386270338202)), keep=Keep.TOP, mode=Mode.PRIVATE)
    cong_9_piece_8 = split(cong_9_piece_8, bisect_by=Plane(origin=(-13.961018177, 9.882347081, 23.815811659), z_dir=(0.09345386270338202, -0.9912279006826004, -0.09345386270338202)), keep=Keep.TOP, mode=Mode.PRIVATE)
    add(cong_9_piece_8)

    # Congé10
    cong_10_edges = [part.edges().sort_by_distance(p)[0] for p in [
        (-16.8, 4.5, 4.3),
    ]]
    fillet(cong_10_edges, radius=CONG_10_R)


solid = part.part
